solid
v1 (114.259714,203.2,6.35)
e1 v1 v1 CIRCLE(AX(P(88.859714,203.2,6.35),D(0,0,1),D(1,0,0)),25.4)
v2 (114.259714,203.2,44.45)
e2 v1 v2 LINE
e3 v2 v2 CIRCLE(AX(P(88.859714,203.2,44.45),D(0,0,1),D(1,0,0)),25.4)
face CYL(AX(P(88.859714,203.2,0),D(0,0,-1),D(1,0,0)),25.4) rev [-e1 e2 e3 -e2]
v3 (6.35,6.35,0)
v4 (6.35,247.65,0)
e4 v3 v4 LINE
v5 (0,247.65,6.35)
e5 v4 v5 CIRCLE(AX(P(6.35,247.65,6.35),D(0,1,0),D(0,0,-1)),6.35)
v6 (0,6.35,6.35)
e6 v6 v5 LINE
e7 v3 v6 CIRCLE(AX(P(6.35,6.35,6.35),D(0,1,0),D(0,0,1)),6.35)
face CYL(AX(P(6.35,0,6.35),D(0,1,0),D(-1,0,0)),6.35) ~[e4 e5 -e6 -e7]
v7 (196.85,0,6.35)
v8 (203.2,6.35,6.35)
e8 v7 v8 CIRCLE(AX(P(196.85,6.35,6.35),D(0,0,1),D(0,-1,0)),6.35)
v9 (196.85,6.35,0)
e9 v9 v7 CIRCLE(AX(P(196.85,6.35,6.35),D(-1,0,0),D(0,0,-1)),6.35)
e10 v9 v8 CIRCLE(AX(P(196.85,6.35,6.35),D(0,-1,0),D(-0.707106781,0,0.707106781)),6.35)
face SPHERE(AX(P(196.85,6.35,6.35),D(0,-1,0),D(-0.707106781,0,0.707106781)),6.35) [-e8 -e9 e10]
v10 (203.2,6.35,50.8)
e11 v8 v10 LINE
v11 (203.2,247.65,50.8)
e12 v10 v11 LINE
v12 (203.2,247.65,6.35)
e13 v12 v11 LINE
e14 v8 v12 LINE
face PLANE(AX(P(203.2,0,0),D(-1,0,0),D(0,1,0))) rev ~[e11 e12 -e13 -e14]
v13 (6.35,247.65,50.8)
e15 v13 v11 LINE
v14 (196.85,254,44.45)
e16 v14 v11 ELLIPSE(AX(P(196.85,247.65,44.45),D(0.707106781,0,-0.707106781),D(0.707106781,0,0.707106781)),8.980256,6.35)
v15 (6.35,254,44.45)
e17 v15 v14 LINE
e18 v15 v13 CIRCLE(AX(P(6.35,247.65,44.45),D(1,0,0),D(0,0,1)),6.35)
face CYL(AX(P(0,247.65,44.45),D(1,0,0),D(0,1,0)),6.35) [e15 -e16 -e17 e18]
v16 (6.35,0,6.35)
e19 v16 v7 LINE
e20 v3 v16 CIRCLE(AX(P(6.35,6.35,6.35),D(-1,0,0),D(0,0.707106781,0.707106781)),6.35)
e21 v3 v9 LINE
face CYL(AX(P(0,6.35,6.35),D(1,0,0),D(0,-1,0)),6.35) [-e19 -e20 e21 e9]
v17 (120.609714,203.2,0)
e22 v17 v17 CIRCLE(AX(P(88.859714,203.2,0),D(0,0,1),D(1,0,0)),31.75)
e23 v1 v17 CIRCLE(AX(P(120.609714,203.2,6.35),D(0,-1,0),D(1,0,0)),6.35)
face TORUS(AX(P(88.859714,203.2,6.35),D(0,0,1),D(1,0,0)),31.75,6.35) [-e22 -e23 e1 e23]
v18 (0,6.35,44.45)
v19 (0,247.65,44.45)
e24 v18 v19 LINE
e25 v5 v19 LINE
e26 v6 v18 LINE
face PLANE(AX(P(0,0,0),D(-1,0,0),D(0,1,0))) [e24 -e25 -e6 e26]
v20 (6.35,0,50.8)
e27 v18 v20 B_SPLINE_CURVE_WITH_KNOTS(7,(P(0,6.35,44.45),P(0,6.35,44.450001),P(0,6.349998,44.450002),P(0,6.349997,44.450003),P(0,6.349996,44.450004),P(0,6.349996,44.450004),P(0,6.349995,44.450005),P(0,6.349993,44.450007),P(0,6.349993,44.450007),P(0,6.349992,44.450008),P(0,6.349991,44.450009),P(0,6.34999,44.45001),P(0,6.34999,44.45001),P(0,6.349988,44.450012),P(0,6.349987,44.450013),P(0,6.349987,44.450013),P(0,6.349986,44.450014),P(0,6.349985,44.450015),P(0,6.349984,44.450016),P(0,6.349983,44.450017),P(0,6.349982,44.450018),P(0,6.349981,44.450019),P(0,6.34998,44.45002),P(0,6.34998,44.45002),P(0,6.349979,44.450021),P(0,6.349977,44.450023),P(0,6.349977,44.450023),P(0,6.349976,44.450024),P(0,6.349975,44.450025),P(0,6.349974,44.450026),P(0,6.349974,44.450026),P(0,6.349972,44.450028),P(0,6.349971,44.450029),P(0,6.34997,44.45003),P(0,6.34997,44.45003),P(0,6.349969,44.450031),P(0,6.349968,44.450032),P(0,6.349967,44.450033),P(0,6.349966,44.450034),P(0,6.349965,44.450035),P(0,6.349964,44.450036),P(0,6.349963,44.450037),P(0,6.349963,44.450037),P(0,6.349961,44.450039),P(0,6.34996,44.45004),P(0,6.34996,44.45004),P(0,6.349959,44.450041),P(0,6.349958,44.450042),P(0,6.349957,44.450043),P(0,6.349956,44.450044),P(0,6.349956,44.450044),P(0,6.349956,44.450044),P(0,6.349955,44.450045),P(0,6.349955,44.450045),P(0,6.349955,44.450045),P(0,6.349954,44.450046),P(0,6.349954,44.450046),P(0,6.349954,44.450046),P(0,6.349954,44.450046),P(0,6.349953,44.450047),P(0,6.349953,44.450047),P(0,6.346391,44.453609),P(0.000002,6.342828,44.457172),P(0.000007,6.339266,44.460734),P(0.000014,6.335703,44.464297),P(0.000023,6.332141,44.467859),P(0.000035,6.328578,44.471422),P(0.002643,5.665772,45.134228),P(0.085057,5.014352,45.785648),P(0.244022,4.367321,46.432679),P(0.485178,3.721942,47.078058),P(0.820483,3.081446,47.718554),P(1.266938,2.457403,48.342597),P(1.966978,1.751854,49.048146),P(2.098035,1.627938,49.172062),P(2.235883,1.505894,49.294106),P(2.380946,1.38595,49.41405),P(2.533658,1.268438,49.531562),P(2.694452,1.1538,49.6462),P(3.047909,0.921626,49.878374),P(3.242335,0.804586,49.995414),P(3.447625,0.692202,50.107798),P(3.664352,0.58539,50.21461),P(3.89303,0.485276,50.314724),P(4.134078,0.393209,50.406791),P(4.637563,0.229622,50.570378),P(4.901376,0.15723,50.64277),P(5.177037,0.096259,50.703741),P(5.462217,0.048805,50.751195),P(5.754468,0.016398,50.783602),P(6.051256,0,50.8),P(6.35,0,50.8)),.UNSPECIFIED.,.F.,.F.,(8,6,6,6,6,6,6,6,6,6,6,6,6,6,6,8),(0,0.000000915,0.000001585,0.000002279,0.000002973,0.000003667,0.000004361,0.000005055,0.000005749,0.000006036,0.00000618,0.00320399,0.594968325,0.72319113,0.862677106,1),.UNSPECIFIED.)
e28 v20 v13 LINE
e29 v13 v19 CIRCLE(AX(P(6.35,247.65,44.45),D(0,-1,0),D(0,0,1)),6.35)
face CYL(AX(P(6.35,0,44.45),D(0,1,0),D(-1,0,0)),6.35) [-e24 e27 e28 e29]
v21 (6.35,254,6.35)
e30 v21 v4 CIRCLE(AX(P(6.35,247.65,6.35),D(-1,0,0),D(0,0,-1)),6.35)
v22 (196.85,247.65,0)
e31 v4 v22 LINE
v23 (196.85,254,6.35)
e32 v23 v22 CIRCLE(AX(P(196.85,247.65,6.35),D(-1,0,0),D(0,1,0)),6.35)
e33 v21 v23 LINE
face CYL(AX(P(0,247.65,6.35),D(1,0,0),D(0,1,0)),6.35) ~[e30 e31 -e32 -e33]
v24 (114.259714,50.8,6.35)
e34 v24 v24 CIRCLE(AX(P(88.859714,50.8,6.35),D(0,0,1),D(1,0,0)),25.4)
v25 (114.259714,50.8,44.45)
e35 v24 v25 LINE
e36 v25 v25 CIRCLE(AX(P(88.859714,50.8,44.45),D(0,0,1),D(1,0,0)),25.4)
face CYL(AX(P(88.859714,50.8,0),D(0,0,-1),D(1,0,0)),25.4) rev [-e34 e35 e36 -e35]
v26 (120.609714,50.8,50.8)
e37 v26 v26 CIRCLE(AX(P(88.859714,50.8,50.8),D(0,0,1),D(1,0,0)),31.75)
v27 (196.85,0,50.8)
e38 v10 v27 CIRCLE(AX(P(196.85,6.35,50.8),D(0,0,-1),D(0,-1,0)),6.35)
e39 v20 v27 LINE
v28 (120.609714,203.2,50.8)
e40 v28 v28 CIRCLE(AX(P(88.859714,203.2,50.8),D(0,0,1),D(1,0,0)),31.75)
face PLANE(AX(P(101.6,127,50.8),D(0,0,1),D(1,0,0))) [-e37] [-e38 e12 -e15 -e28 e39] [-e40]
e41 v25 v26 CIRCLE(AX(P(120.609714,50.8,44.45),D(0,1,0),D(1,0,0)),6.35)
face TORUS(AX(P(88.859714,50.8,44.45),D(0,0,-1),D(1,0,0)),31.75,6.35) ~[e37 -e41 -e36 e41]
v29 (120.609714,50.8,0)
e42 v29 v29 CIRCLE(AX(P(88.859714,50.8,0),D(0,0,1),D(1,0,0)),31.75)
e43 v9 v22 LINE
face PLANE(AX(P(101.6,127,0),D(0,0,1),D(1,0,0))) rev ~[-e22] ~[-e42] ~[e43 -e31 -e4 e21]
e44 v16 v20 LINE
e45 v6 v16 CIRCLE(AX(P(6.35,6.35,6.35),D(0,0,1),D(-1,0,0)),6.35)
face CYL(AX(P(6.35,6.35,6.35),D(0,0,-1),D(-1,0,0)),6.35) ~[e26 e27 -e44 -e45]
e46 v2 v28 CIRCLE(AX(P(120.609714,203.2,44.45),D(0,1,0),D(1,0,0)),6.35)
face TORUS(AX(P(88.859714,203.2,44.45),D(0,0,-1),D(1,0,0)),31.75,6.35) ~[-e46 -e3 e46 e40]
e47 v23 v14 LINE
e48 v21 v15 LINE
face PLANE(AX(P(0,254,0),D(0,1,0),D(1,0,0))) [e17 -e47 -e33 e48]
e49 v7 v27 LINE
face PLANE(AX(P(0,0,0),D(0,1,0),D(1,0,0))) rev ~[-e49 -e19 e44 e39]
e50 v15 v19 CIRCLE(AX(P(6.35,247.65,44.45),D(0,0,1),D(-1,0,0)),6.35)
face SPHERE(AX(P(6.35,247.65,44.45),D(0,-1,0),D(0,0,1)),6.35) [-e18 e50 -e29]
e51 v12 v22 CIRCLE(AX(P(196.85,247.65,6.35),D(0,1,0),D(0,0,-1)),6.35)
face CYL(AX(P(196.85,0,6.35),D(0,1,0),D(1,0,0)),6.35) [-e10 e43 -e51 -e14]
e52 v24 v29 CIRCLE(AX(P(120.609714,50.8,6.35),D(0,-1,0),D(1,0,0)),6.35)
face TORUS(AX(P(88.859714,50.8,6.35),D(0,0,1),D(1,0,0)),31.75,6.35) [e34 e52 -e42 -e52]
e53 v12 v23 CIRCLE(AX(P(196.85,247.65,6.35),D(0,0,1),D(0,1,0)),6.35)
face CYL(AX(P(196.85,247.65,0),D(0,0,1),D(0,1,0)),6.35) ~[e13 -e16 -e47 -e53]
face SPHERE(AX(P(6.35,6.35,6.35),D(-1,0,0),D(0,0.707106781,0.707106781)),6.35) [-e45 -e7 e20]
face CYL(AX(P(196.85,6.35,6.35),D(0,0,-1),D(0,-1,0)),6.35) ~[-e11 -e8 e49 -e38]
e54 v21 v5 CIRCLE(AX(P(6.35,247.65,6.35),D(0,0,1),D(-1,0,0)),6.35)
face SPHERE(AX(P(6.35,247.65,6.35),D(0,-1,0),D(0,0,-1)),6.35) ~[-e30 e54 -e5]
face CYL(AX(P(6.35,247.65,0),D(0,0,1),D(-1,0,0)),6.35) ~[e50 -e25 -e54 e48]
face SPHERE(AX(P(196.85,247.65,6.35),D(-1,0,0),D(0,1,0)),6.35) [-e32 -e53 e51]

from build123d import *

# Parameters (mm, degrees)
F0_W         = 203.2
F0_H         = 254
F0_R         = 25.4
F1_DEPTH     = 50.8
F2_R         = 6.35
F3_T1_DEPTH  = 53.975
F3_T3_DEPTH  = 60.325
F3_S7_W      = 6.477
F3_S7_H      = 6.477
F3_T8_DEPTH  = 6.477
F3_S13_W     = 6.477
F3_S13_H     = 6.477
F3_T14_DEPTH = 6.477


# Not quite as in the source:
# - a fillet or chamfer that OpenCascade refuses, or shapes differently, is made with other operations: its cross-section is extruded or revolved along the edge and cut away or added


with BuildPart() as f1:
    # F0 (on Top) → F1 (new body)
    with BuildSketch(Plane.XY):
        with Locations((101.6, 127)):
            Rectangle(F0_W, F0_H)
        with Locations((88.8597142273, 50.8)):
            Circle(F0_R, mode=Mode.SUBTRACT)
        with Locations((88.8597142273, 203.2)):
            Circle(F0_R, mode=Mode.SUBTRACT)
    extrude(amount=F1_DEPTH)

    # F2
    f2_edges = [f1.edges().sort_by_distance(p)[0] for p in [
        (0, 127, 0),
        (0, 127, 50.8),
        (101.6, 254, 50.8),
        (63.459714, 203.2, 50.8),
        (63.459714, 50.8, 50.8),
        (101.6, 254, 0),
        (0, 254, 25.4),
        (203.2, 254, 25.4),
        (63.459714, 203.2, 0),
        (63.459714, 50.8, 0),
        (101.6, 0, 0),
        (203.2, 127, 0),
    ]]
    fillet(f2_edges, radius=F2_R)

    # F3: fillet of radius 6.35 on 6 edges, made by hand

    # F3_s2 → F3_t1 (cut)
    with BuildSketch(Plane.XY.offset(6.35)):
        with BuildLine():
            ThreePointArc((0, 6.35), (1.8598719395, 1.8598719395), (6.35, 0))
            Line((6.35, 0), (0, 0))
            Line((0, 0), (0, 6.35))
        make_face()
    extrude(amount=F3_T1_DEPTH, mode=Mode.SUBTRACT)

    # F3_s4 → F3_t3 (cut)
    with BuildSketch(Plane.XY.offset(6.35)):
        with BuildLine():
            ThreePointArc((196.85, 0), (201.3401280605, 1.8598719395), (203.2, 6.35))
            Line((203.2, 6.35), (203.2, 0))
            Line((203.2, 0), (196.85, 0))
        make_face()
    extrude(amount=F3_T3_DEPTH, mode=Mode.SUBTRACT)


with BuildPart() as f3_tool6:
    # F3_s7 → F3_t8 (new body)
    with BuildSketch(Plane.YZ.offset(6.35)):
        with Locations((3.1115, 3.1115)):
            Rectangle(F3_S7_W, F3_S7_H)
    extrude(amount=-F3_T8_DEPTH)

    # F3_s9 → F3_t10 (revolve, cut)
    with BuildSketch(Plane(origin=(6.35, 6.35, 6.35), x_dir=(0, 0.7071067812, 0.7071067812), z_dir=(0, -0.7071067812, 0.7071067812))):
        with BuildLine():
            ThreePointArc((0, -6.35), (6.35, 0), (0, 6.35))
            Line((0, 6.35), (0, -6.35))
        make_face()
    revolve(axis=Axis((6.35, 6.35, 6.35), (-1, 0, 0)), mode=Mode.SUBTRACT)


with BuildPart() as f1_1:
    add(f1.part)

    # F3_t5: cut F3_tool6
    add(f3_tool6.part, mode=Mode.SUBTRACT)


with BuildPart() as f3_tool12:
    # F3_s13 → F3_t14 (new body)
    with BuildSketch(Plane.XZ.offset(-6.35)):
        with Locations((200.0885, 3.1115)):
            Rectangle(F3_S13_W, F3_S13_H)
    extrude(amount=F3_T14_DEPTH)

    # F3_s15 → F3_t16 (revolve, cut)
    with BuildSketch(Plane(origin=(196.85, 6.35, 6.35), x_dir=(-0.7071067812, 0, 0.7071067812), z_dir=(0.7071067812, 0, 0.7071067812))):
        with BuildLine():
            ThreePointArc((0, -6.35), (6.35, 0), (0, 6.35))
            Line((0, 6.35), (0, -6.35))
        make_face()
    revolve(axis=Axis((196.85, 6.35, 6.35), (0, -1, 0)), mode=Mode.SUBTRACT)


with BuildPart() as f1_2:
    add(f1_1.part)

    # F3_t11: cut F3_tool12
    add(f3_tool12.part, mode=Mode.SUBTRACT)


solid = f1_2.part
